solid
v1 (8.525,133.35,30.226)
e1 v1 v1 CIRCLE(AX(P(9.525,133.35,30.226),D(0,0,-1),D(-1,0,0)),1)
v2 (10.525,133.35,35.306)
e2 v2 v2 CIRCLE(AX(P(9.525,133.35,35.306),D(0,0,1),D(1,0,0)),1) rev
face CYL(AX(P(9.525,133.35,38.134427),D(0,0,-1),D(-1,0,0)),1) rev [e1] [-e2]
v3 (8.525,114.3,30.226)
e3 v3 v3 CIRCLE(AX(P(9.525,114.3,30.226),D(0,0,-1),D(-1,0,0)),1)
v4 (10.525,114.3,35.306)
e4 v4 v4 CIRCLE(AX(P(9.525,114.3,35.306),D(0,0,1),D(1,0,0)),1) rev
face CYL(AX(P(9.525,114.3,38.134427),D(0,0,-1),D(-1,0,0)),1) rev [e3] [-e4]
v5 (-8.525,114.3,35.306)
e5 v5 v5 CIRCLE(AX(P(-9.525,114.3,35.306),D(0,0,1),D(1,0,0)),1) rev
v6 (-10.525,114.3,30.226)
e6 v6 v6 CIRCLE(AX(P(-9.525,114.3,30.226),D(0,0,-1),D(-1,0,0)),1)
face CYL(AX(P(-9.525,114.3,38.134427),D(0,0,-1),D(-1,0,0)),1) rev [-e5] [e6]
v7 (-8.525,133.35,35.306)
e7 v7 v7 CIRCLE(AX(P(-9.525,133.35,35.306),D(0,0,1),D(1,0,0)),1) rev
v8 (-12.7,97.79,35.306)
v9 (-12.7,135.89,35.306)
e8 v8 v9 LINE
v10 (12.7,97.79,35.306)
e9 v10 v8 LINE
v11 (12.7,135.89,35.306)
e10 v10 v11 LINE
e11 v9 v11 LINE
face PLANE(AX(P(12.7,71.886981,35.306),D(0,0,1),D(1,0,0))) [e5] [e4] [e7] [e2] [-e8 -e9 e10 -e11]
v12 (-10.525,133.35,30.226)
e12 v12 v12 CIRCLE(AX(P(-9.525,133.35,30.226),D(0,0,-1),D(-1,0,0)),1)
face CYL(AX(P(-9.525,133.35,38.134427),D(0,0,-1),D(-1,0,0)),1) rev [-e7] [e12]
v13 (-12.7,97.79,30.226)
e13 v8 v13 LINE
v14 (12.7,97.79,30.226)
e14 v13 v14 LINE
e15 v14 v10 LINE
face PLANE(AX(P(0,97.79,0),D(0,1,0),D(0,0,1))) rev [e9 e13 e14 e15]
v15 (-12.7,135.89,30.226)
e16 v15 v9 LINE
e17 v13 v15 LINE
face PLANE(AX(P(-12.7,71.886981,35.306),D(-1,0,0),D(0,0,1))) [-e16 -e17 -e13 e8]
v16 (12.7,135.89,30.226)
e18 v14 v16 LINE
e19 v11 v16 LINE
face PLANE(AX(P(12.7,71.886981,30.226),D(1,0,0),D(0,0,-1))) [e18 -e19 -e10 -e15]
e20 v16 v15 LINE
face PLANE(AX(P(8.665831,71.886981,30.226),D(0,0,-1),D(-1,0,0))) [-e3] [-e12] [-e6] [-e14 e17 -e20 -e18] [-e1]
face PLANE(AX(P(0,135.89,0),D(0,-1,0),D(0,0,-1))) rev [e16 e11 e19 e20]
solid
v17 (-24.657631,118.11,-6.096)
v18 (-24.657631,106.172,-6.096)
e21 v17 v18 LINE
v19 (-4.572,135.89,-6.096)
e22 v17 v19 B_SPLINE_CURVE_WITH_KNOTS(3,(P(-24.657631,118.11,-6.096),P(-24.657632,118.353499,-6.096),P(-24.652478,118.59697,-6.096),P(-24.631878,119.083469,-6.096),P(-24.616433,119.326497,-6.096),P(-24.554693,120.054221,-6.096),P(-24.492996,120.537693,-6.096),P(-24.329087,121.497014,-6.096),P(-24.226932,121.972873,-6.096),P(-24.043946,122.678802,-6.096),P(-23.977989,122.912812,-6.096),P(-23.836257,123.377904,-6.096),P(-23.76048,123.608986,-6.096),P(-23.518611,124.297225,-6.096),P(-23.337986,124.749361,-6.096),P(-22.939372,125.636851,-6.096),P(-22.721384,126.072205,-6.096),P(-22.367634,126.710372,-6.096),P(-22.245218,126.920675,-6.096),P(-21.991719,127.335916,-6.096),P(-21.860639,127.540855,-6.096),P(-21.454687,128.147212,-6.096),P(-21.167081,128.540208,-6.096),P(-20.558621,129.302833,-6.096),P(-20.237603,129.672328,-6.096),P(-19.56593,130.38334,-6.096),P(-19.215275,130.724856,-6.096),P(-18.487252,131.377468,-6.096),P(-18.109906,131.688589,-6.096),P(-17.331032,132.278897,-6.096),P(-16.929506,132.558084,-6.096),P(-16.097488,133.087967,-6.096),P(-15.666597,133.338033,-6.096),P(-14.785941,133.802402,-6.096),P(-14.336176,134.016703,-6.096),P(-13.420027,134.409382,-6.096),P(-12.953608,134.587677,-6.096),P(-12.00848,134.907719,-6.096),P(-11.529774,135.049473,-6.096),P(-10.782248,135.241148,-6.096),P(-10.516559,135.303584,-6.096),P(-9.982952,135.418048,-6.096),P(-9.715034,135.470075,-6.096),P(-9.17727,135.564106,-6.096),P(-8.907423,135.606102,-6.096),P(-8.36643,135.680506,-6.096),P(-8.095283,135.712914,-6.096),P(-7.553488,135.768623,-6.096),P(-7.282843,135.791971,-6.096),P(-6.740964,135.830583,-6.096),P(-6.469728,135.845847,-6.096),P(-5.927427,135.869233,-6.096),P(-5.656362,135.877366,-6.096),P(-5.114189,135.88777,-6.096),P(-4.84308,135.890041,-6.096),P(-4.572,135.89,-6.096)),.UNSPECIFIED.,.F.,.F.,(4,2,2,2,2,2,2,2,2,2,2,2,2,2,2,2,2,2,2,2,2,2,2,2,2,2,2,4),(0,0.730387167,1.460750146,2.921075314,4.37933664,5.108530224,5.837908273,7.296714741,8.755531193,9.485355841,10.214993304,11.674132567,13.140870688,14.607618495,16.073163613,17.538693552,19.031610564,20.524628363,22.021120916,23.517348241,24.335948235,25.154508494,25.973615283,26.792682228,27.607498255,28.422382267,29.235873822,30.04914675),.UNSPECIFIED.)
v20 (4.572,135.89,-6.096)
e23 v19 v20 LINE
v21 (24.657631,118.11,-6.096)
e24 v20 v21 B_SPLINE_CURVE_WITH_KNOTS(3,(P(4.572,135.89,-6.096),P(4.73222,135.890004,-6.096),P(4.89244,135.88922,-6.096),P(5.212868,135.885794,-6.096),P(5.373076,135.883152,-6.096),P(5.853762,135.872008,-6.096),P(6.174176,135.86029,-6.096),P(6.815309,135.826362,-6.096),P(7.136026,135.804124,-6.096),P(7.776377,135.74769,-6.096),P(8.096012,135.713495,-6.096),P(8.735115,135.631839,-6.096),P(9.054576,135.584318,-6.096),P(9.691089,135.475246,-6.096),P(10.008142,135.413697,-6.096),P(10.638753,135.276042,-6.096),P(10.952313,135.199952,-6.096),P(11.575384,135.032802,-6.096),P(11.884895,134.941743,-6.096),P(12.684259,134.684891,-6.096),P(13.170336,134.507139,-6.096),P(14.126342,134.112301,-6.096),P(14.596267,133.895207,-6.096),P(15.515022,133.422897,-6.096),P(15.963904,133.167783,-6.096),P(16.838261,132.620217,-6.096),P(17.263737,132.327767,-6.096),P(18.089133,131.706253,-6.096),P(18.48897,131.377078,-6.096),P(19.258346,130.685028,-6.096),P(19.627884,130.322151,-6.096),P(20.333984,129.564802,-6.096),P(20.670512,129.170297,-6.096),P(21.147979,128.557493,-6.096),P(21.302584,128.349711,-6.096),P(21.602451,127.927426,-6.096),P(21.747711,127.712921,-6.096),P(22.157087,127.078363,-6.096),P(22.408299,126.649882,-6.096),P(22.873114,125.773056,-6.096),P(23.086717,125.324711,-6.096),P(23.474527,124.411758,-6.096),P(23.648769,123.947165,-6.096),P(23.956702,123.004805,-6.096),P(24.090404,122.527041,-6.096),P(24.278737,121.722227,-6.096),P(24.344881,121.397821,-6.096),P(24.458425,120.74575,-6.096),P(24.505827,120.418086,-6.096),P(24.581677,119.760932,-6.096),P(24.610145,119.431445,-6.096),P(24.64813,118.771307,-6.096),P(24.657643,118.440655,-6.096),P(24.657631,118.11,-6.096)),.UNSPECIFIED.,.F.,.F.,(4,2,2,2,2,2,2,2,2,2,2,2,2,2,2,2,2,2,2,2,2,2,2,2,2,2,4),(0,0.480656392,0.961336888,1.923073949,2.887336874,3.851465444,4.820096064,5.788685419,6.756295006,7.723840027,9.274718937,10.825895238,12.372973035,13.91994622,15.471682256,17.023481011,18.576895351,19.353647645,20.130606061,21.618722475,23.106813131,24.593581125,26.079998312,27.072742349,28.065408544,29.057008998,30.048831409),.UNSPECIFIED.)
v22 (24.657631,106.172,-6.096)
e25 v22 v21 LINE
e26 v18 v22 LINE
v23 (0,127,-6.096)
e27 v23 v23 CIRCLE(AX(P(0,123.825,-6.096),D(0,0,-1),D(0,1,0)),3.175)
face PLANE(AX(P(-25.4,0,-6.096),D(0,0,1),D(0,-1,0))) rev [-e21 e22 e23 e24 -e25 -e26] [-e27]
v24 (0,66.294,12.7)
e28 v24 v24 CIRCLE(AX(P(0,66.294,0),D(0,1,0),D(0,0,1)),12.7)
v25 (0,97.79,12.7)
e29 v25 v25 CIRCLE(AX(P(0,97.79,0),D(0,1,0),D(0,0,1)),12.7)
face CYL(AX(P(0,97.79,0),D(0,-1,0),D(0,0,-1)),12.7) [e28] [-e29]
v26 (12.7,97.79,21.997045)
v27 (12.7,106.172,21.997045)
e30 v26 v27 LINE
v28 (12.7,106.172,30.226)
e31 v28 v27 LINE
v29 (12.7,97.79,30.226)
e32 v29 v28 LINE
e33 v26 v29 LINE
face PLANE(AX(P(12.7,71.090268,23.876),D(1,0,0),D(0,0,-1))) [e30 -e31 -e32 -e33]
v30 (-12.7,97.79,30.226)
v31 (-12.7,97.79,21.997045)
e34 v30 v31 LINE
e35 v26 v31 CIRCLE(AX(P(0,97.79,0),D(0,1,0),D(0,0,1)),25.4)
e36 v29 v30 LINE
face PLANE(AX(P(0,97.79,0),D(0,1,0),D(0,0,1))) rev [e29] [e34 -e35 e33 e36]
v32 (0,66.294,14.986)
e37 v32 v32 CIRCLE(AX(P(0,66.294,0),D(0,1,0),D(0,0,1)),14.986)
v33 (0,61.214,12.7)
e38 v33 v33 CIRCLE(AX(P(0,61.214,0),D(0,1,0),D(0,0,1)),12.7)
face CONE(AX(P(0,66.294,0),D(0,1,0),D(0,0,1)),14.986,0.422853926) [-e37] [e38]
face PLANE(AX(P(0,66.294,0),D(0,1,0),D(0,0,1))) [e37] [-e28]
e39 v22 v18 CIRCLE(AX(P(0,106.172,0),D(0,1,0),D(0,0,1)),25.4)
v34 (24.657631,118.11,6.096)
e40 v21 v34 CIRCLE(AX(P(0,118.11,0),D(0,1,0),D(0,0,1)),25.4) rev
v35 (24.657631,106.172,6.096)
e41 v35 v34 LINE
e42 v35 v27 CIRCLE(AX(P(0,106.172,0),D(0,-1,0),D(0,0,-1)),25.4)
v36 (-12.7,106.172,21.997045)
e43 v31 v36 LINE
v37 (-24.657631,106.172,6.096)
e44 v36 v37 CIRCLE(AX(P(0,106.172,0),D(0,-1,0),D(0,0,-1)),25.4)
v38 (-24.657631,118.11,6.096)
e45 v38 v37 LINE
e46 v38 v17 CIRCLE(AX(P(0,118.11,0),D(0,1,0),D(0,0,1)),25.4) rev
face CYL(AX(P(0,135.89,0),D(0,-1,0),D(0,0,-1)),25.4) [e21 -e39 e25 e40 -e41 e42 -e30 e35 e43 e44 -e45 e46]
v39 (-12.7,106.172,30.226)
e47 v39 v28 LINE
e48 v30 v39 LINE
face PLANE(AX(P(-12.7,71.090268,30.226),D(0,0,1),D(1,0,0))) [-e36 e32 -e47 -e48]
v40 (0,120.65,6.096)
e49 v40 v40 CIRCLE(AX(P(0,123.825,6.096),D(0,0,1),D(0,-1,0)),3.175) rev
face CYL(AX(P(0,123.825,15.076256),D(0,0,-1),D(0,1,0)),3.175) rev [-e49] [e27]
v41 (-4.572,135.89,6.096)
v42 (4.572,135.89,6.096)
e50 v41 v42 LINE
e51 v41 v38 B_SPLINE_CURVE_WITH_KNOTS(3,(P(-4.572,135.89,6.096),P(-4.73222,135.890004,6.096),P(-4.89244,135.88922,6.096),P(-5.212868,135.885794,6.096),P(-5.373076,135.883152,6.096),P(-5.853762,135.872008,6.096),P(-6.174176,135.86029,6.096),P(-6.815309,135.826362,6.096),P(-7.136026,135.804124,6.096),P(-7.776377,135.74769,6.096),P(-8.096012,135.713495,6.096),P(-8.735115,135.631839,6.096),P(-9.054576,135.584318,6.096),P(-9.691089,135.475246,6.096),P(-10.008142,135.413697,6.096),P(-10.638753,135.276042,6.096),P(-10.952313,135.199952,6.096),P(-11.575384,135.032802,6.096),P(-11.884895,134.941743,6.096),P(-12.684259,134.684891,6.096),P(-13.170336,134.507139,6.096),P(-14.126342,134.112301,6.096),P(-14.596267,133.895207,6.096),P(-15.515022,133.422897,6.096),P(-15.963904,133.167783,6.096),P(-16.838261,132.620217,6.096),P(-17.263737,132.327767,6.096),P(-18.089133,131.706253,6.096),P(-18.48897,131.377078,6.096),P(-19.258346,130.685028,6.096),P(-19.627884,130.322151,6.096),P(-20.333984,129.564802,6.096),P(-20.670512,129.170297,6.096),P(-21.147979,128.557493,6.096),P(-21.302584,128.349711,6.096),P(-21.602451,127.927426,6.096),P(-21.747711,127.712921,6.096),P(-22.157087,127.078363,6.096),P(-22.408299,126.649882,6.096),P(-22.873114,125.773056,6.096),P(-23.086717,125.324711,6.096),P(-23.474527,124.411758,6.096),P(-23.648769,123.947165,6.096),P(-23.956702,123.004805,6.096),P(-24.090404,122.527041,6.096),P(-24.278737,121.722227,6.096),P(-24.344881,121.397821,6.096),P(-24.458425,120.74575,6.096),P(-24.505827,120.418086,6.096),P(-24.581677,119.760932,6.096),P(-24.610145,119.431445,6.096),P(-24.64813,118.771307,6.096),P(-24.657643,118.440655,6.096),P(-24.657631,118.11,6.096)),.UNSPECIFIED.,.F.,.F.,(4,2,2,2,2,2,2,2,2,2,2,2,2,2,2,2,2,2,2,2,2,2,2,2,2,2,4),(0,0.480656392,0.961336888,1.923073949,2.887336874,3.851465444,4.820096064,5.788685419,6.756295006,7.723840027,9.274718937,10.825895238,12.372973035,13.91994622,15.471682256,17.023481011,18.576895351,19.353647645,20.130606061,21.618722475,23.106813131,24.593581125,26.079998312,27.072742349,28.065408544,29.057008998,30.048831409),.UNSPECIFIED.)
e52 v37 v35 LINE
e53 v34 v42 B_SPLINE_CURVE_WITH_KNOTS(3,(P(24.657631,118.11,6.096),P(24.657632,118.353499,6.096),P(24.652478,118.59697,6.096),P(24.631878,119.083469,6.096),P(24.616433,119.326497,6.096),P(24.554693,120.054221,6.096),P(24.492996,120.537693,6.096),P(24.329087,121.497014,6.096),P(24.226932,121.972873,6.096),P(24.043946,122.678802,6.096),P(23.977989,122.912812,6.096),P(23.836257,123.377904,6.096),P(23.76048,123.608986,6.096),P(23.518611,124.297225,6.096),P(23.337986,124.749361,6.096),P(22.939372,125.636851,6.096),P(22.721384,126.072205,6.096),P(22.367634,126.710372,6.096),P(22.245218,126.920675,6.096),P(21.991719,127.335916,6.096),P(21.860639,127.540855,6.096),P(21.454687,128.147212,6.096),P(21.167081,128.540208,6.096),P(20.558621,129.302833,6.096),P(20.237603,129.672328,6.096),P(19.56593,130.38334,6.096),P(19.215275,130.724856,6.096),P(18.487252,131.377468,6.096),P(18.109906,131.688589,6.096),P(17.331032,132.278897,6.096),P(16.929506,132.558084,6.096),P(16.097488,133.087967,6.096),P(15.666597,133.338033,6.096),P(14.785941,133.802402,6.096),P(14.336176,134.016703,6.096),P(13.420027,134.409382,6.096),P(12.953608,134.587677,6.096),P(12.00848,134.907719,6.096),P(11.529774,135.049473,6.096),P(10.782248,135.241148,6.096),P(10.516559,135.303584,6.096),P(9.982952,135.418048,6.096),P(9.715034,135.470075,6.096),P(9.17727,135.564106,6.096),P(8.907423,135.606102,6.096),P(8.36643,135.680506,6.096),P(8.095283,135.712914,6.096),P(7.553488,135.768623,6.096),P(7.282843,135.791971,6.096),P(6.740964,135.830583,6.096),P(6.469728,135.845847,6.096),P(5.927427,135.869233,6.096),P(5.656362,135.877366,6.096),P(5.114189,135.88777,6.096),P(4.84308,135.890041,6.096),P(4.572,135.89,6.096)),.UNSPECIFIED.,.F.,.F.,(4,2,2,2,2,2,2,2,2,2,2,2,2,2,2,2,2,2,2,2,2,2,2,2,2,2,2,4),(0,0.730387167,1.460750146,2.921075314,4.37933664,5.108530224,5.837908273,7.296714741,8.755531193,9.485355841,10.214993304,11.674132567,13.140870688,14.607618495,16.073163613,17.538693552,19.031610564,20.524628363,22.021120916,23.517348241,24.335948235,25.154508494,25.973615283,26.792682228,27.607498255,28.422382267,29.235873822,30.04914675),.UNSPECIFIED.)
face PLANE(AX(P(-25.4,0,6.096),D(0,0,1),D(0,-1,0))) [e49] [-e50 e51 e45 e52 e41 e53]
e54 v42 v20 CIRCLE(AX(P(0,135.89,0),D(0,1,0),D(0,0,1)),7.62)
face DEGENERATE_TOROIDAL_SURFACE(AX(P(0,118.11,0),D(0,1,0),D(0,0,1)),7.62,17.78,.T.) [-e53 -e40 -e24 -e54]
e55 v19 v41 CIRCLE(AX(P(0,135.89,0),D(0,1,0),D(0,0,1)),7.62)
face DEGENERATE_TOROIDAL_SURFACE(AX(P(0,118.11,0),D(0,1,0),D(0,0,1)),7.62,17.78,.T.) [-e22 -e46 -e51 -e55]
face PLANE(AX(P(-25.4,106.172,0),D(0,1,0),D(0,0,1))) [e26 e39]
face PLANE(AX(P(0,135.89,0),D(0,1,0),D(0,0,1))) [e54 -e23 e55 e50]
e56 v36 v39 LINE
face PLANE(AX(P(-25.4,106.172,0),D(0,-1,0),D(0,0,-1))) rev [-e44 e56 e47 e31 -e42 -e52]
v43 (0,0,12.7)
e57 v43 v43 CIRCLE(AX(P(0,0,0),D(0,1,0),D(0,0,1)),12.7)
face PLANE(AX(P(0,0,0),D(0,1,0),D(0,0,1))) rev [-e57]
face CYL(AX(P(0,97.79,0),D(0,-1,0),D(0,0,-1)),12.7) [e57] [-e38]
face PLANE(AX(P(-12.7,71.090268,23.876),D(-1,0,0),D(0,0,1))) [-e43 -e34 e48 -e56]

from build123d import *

# Parameters (mm, degrees)
SKETCH1_R                            = 12.7
PART_THAT_GOES_INTO_BASE_DEPTH       = 97.79
SKETCH3_R                            = 25.4
TOP_PART_EXTRUDE_DEPTH               = 38.1
CUT_START                            = -75.457631354
CUT_TO_ACCOMMODATE_ENCODER_OUTLINE_W = 19.304
CUT_TO_ACCOMMODATE_ENCODER_OUTLINE_H = 29.718
CUT_TO_ACCOMMODATE_ENCODER_DEPTH     = 49.315262708
SKETCH7_R                            = 3.175
BOLT_HOLE_DEPTH                      = 12.192
FILLET_TO_ACCOMMODATE_SHOULDER_R     = 17.78
BOSS_EXTRUDE1_DEPTH                  = 38.1
BOSS_EXTRUDE2_START                  = -8.382
BOSS_EXTRUDE2_DEPTH                  = 8.382
SKETCH13_R                           = 1
CUT_EXTRUDE1_DEPTH                   = 5.08


# Read off the part's stored shape, not the designer's step: Cut to Accommodate Encoder
with BuildPart() as part:
    # Sketch1 → Part that goes into base (new body)
    with BuildSketch(Plane(origin=(0, 0, 0), x_dir=(1, 0, 0), z_dir=(0, 1, 0))):
        with Locations(Location((0, 0, 0), (0, 0, 270))):
            Circle(SKETCH1_R)
    extrude(amount=PART_THAT_GOES_INTO_BASE_DEPTH)

    # Sketch2 → Clip in mechanism (revolve)
    with BuildSketch(Plane.XY, mode=Mode.PRIVATE) as clip_in_mechanism_sk:
        Polygon((12.7, 61.214), (12.7, 66.294), (14.986, 66.294), align=None)
    revolve(clip_in_mechanism_sk.sketch.rotate(Axis((0, 97.79, 0), (0, -1, 0)), 90), axis=Axis((0, 97.79, 0), (0, -1, 0)))

    # Sketch3 → Top part Extrude (add)
    with BuildSketch(Plane(origin=(0, 97.79, 0), x_dir=(1, 0, 0), z_dir=(0, 1, 0))):
        with Locations(Location((0, 0, 0), (0, 0, 90))):
            Circle(SKETCH3_R)
    extrude(amount=TOP_PART_EXTRUDE_DEPTH)

    # Cut to Accommodate Encoder outline → Cut to Accommodate Encoder (cut)
    with BuildSketch(Plane(origin=(50.8, 0, 0), x_dir=(0, 0, -1), z_dir=(1, 0, 0)).offset(CUT_START)):
        with Locations((15.748, 121.031)):
            Rectangle(CUT_TO_ACCOMMODATE_ENCODER_OUTLINE_W, CUT_TO_ACCOMMODATE_ENCODER_OUTLINE_H)
        with Locations((-15.748, 121.031)):
            Rectangle(CUT_TO_ACCOMMODATE_ENCODER_OUTLINE_W, CUT_TO_ACCOMMODATE_ENCODER_OUTLINE_H)
    extrude(amount=CUT_TO_ACCOMMODATE_ENCODER_DEPTH, mode=Mode.SUBTRACT)

    # Sketch7 → Bolt Hole (cut)
    with BuildSketch(Plane(origin=(0, 0, -6.096), x_dir=(-1, 0, 0), z_dir=(0, 0, -1))):
        with Locations(Location((0, 123.825, 0), (0, 0, 90))):
            Circle(SKETCH7_R)
    extrude(amount=-BOLT_HOLE_DEPTH, mode=Mode.SUBTRACT)

    # Fillet to Accommodate shoulder
    fillet_to_accommodate_shoulder_edges = [part.edges().sort_by_distance(p)[0] for p in [
        (25.4, 135.89, 0),
        (-25.4, 135.89, 0),
    ]]
    fillet(fillet_to_accommodate_shoulder_edges, radius=FILLET_TO_ACCOMMODATE_SHOULDER_R)

    # Sketch12 → Boss-Extrude2 (add)
    with BuildSketch(Plane(origin=(0, 106.172, 0), x_dir=(1, 0, 0), z_dir=(0, 1, 0)).offset(BOSS_EXTRUDE2_START)):
        with BuildLine():
            Line((12.7, -23.876), (12.7, -21.997045256))
            ThreePointArc((12.7, -21.997045256), (10.724145631, -23.02504507), (8.665830831, -23.876))
            ThreePointArc((8.665830831, -23.876), (0, -25.4), (-8.665830831, -23.876))
            ThreePointArc((-8.665830831, -23.876), (-10.724145631, -23.02504507), (-12.7, -21.997045256))
            Line((-12.7, -21.997045256), (-12.7, -23.876))
            Line((-12.7, -23.876), (-12.7, -30.226))
            Line((-12.7, -30.226), (12.7, -30.226))
            Line((12.7, -30.226), (12.7, -23.876))
        make_face()
    extrude(amount=BOSS_EXTRUDE2_DEPTH)


with BuildPart() as body_2:
    # Sketch11 → Boss-Extrude1 (new body)
    with BuildSketch(Plane(origin=(0, 135.89, 0), x_dir=(1, 0, 0), z_dir=(0, 1, 0))):
        Polygon((12.7, -30.226), (12.7, -35.306), (-12.7, -35.306), (-12.7, -30.226), (-8.665830831, -30.226), (8.665830831, -30.226), align=None)
    extrude(amount=-BOSS_EXTRUDE1_DEPTH)

    # Sketch13 → Cut-Extrude1 (cut)
    with BuildSketch(Plane(origin=(0, 0, 30.226), x_dir=(-1, 0, 0), z_dir=(0, 0, -1))):
        with Locations((-9.525, 114.3)):
            Circle(SKETCH13_R)
        with Locations((-9.525, 133.35)):
            Circle(SKETCH13_R)
        with Locations((9.525, 114.3)):
            Circle(SKETCH13_R)
        with Locations((9.525, 133.35)):
            Circle(SKETCH13_R)
    extrude(amount=-CUT_EXTRUDE1_DEPTH, mode=Mode.SUBTRACT)


solid = Compound([part.part, body_2.part])
